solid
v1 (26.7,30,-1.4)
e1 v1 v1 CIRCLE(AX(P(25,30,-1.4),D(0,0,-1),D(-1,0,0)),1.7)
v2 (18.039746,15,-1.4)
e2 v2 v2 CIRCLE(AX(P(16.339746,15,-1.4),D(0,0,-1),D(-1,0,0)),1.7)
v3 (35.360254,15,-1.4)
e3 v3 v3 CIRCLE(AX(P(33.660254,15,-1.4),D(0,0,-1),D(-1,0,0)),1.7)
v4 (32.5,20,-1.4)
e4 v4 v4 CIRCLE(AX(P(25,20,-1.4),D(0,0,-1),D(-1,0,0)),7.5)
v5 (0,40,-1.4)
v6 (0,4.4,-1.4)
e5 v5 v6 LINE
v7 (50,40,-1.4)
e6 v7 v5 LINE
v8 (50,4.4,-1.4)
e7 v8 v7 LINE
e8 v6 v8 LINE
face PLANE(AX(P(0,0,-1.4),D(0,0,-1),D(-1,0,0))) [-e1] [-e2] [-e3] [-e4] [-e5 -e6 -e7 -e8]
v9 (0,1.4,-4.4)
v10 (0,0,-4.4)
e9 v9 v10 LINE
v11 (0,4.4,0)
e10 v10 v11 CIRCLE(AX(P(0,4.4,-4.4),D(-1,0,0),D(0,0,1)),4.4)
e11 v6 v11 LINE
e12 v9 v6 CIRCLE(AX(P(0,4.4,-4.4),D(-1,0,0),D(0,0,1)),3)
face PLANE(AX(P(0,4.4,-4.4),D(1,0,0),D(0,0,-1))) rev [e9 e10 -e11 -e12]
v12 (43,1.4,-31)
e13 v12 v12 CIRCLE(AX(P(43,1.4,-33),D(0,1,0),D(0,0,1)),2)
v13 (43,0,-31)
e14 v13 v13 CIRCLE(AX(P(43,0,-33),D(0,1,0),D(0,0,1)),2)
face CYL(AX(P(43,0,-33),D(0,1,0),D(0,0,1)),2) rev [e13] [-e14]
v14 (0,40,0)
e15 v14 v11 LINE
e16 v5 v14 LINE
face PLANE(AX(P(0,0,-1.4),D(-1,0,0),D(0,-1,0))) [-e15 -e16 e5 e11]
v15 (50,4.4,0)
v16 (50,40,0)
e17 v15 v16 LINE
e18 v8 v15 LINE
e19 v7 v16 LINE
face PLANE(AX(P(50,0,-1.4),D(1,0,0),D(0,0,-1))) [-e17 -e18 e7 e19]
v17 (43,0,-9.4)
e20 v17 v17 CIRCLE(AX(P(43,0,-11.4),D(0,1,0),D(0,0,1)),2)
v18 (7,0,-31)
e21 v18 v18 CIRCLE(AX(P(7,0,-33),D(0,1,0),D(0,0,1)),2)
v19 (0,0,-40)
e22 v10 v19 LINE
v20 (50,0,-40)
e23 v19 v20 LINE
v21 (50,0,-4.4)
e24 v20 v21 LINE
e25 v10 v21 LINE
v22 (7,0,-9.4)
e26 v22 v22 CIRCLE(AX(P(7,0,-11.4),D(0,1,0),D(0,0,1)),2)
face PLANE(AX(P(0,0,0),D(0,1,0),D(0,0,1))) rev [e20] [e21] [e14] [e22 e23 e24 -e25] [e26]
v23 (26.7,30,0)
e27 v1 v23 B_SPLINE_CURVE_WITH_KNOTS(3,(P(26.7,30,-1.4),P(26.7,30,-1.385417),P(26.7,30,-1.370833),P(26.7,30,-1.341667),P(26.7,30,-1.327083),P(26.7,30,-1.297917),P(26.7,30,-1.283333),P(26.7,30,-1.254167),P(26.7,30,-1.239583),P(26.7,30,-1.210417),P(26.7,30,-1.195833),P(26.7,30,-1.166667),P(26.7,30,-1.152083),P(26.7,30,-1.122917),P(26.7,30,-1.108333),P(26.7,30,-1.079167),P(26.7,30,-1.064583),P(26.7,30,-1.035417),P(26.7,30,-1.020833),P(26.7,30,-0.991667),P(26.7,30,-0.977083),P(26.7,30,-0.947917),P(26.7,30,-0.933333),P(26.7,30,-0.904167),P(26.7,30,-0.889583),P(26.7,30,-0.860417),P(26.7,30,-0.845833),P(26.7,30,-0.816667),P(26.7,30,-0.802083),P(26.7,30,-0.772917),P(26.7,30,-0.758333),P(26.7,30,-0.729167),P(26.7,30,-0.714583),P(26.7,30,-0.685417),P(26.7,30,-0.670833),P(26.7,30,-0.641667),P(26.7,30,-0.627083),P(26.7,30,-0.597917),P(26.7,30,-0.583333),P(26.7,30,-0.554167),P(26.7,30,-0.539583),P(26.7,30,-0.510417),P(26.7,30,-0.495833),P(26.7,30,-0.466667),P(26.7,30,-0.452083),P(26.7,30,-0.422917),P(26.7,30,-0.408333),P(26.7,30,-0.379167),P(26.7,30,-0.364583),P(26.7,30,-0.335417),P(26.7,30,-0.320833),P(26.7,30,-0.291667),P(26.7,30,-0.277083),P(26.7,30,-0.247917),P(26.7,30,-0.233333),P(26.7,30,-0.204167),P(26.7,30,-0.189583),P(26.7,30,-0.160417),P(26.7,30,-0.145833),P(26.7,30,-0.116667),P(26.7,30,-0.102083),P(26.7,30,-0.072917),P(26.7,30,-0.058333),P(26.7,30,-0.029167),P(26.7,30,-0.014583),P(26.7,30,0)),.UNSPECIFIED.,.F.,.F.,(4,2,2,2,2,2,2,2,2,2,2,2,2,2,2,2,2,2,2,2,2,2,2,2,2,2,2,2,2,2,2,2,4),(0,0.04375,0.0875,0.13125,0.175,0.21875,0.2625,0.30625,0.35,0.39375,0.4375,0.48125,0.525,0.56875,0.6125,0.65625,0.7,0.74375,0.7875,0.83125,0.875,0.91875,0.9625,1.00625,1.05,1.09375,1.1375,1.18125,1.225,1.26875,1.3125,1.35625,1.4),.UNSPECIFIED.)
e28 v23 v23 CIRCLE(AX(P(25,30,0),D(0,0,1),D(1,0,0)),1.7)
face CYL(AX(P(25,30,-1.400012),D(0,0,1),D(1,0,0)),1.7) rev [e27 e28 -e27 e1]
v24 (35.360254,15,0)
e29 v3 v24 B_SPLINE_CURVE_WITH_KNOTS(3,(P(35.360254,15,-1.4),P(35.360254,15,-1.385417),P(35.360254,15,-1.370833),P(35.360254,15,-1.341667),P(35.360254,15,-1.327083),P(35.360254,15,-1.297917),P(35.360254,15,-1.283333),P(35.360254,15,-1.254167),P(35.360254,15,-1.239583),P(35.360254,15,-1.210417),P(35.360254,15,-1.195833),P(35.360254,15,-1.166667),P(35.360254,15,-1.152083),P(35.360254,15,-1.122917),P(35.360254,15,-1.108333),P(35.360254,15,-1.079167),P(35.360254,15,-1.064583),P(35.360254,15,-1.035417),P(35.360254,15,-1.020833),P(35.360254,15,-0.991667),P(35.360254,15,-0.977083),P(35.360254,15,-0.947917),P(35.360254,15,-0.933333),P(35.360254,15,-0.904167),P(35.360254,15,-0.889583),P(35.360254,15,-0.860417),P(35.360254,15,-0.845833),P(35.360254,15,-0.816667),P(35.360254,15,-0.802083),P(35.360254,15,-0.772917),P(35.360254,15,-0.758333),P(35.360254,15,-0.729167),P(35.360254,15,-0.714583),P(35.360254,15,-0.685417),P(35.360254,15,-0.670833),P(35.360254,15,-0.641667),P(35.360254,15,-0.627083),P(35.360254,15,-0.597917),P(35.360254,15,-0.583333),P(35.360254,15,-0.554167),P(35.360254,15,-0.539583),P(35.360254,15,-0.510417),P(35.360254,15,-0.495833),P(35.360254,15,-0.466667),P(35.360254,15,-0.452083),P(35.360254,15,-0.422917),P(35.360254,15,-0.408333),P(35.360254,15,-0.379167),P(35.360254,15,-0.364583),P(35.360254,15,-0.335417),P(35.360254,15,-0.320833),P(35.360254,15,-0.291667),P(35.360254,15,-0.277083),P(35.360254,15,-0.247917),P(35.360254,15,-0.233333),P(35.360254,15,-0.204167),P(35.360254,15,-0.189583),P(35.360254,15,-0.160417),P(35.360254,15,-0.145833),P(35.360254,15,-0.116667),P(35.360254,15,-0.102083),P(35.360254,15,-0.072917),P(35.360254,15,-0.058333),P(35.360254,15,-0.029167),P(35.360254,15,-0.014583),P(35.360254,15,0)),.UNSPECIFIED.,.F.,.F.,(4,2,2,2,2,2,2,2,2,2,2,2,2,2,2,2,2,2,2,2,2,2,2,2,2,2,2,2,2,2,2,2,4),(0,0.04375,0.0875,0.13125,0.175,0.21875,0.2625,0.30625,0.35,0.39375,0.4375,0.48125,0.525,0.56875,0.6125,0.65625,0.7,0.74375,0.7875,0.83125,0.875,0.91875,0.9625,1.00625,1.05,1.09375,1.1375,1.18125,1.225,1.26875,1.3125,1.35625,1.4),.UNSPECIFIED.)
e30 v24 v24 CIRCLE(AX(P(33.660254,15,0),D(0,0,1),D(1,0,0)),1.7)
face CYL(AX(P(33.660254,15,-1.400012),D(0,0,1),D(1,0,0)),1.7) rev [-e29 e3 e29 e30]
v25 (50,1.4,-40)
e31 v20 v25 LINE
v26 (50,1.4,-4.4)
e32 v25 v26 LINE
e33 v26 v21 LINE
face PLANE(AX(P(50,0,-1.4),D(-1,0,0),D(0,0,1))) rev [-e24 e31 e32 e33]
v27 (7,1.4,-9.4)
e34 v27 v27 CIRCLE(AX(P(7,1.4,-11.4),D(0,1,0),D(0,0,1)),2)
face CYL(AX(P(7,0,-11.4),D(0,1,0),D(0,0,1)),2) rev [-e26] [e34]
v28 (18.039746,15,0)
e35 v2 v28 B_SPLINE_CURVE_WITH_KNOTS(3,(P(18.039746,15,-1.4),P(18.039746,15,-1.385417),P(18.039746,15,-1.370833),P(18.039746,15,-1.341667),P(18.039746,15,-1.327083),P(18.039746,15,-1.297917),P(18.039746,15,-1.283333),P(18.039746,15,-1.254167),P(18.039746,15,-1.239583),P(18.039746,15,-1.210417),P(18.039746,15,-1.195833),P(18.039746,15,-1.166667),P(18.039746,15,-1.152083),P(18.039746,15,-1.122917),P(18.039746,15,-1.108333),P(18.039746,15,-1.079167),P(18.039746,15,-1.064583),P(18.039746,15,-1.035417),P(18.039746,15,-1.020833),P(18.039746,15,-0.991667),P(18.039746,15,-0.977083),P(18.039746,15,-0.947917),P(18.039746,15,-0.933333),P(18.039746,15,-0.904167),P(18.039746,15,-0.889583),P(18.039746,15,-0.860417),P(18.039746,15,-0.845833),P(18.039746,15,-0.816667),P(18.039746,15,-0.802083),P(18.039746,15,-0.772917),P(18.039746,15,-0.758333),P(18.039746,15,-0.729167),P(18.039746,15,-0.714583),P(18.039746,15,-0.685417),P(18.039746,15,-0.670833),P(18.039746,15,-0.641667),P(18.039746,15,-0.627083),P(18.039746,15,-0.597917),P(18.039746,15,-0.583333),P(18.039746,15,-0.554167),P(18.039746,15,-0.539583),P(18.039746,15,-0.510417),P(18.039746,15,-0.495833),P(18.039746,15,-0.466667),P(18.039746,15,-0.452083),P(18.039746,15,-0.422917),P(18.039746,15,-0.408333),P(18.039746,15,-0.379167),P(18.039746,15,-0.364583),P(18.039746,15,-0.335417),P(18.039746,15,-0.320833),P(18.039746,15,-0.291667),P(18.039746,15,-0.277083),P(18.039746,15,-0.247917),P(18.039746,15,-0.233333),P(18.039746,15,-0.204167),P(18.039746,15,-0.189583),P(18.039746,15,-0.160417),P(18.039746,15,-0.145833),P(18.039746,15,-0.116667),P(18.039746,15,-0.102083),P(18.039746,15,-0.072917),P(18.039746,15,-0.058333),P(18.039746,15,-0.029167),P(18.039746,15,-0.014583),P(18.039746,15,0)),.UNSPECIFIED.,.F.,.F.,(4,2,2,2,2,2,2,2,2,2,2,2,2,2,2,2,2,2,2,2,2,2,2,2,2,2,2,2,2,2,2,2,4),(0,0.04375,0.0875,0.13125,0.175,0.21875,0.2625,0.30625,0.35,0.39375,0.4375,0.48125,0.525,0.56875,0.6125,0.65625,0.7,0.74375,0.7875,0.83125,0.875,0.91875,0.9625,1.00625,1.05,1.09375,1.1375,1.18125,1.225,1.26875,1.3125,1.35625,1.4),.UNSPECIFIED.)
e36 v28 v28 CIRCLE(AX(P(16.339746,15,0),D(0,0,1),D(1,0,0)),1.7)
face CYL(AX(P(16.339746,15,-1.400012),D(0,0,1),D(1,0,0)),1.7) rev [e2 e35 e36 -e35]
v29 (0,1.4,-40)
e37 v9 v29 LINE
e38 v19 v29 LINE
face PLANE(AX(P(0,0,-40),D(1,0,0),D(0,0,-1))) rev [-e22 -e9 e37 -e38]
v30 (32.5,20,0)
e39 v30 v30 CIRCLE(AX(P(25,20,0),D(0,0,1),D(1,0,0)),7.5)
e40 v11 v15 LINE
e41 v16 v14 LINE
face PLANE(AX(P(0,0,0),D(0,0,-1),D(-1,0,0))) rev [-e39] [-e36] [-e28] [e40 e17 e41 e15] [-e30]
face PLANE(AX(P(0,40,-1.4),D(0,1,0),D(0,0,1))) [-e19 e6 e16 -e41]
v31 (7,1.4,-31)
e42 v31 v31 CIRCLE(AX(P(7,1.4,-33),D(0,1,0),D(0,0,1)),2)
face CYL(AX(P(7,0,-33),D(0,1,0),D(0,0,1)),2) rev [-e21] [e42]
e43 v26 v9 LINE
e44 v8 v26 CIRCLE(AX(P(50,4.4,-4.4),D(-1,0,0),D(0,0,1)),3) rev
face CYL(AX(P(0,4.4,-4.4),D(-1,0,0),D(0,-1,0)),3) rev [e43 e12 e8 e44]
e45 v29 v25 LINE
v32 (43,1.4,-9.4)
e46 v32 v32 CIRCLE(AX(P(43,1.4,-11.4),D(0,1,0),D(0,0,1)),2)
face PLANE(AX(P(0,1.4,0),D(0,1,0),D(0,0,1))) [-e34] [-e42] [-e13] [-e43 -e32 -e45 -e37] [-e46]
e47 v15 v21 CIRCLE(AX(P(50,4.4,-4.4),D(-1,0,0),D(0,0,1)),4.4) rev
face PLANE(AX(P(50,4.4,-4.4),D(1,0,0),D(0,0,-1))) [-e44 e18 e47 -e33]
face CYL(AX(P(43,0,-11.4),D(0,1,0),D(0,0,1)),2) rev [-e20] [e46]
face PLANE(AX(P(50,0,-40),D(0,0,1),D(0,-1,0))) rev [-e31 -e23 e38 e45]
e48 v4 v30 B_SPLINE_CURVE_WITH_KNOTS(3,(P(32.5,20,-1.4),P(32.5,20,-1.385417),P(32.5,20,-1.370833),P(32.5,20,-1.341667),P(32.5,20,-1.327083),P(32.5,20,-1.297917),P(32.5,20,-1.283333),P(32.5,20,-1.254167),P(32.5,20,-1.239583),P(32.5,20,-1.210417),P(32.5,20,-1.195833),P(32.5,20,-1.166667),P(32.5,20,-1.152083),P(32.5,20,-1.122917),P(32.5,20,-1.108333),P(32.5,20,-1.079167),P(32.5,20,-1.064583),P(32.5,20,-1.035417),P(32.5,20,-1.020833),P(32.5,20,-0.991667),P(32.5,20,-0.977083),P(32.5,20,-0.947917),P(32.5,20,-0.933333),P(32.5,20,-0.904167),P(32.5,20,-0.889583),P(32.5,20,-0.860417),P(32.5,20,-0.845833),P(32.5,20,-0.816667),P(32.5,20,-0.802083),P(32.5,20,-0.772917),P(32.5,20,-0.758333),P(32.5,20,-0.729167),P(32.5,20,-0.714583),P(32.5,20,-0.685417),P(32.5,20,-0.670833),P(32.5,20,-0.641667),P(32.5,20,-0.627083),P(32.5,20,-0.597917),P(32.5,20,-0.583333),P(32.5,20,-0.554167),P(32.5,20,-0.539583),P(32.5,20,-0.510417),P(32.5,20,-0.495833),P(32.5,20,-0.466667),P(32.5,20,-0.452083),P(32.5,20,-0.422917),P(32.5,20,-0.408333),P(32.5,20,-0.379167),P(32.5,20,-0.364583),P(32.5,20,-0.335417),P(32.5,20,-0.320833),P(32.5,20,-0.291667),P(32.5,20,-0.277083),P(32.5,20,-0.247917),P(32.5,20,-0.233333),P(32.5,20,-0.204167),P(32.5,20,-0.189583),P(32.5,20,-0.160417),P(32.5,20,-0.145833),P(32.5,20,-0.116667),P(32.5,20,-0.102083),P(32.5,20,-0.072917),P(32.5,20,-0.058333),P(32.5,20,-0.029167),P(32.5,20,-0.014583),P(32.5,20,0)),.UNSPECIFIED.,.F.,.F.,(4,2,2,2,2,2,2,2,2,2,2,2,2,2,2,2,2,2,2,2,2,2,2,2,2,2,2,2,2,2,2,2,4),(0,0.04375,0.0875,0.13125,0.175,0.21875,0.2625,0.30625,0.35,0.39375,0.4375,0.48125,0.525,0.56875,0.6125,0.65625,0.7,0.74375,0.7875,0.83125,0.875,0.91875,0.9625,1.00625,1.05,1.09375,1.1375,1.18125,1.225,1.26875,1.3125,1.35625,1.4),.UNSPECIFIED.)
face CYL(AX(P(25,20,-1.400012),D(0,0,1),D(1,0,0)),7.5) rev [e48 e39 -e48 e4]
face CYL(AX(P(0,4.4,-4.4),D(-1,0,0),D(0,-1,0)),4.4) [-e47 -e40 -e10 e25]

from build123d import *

# Parameters (mm, degrees)
SKETCH6_W                    = 50
SKETCH6_H                    = 40
BASE_FLANGE2_DEPTH           = 1.4
CUT_EXTRUDE2_DEPTH           = 65.046545574
CUT_EXTRUDE2_DEPTH_BACK      = 65.046545574
SKETCH11_R                   = 7.5
SKETCH11_R_2                 = 1.7
EDGE_FLANGE1_STRIP_W         = 11.6
EDGE_FLANGE1_STRIP_H         = 1.4
EDGE_FLANGE1_STRIP_CUT_DEPTH = 50
EDGE_FLANGE1_DEPTH           = 50
SKETCH35_R                   = 2
CUT_EXTRUDE3_DEPTH           = 75.766035069


# Sheet-metal steps are written as plain solids
with BuildPart() as part:
    # Sketch6 → Base-Flange2 (new body)
    with BuildSketch(Plane.XY):
        with Locations((25, 20)):
            Rectangle(SKETCH6_W, SKETCH6_H)
    extrude(amount=-BASE_FLANGE2_DEPTH)

    # Sketch11 → Cut-Extrude2 (cut, two sides: drawn at the far end of the back side and taken through both)
    with BuildSketch(Plane.XY.offset(-1.4).offset(-CUT_EXTRUDE2_DEPTH_BACK)):
        with Locations((25, 20)):
            Circle(SKETCH11_R)
        with Locations((25, 30)):
            Circle(SKETCH11_R_2)
        with Locations((16.339745962, 15)):
            Circle(SKETCH11_R_2)
        with Locations((33.660254038, 15)):
            Circle(SKETCH11_R_2)
    extrude(amount=CUT_EXTRUDE2_DEPTH + CUT_EXTRUDE2_DEPTH_BACK, mode=Mode.SUBTRACT)

    # Edge-Flange1 strip (across the edge) → Edge-Flange1 strip cut (cut)
    with BuildSketch(Plane(origin=(50, 0, -1.4), x_dir=(0, 1, 0), z_dir=(-1, 0, 0))):
        with Locations((-1.4, -0.7)):
            Rectangle(EDGE_FLANGE1_STRIP_W, EDGE_FLANGE1_STRIP_H)
    extrude(amount=EDGE_FLANGE1_STRIP_CUT_DEPTH, mode=Mode.SUBTRACT)

    # Edge-Flange1 section (across the edge) → Edge-Flange1 (add)
    with BuildSketch(Plane(origin=(50, 0, -1.4), x_dir=(0, 1, 0), z_dir=(-1, 0, 0))):
        with BuildLine():
            Line((0, 3), (0, 38.6))
            Line((0, 38.6), (1.4, 38.6))
            Line((1.4, 38.6), (1.4, 3))
            ThreePointArc((1.4, 3), (2.278679656, 0.878679656), (4.4, 0))
            Line((4.4, 0), (4.4, -1.4))
            ThreePointArc((4.4, -1.4), (1.288730163, -0.111269837), (0, 3))
        make_face()
    extrude(amount=EDGE_FLANGE1_DEPTH)

    # Sketch35 → Cut-Extrude3 (cut, through all)
    with BuildSketch(Plane(origin=(0, 1.4, 0), x_dir=(1, 0, 0), z_dir=(0, 1, 0))):
        with Locations(Location((43, 11.4, 0), (0, 0, 270))):
            Circle(SKETCH35_R)
        with Locations(Location((7, 11.4, 0), (0, 0, 270))):
            Circle(SKETCH35_R)
        with Locations(Location((43, 33, 0), (0, 0, 270))):
            Circle(SKETCH35_R)
        with Locations(Location((7, 33, 0), (0, 0, 270))):
            Circle(SKETCH35_R)
    extrude(amount=-CUT_EXTRUDE3_DEPTH, mode=Mode.SUBTRACT)


solid = part.part
